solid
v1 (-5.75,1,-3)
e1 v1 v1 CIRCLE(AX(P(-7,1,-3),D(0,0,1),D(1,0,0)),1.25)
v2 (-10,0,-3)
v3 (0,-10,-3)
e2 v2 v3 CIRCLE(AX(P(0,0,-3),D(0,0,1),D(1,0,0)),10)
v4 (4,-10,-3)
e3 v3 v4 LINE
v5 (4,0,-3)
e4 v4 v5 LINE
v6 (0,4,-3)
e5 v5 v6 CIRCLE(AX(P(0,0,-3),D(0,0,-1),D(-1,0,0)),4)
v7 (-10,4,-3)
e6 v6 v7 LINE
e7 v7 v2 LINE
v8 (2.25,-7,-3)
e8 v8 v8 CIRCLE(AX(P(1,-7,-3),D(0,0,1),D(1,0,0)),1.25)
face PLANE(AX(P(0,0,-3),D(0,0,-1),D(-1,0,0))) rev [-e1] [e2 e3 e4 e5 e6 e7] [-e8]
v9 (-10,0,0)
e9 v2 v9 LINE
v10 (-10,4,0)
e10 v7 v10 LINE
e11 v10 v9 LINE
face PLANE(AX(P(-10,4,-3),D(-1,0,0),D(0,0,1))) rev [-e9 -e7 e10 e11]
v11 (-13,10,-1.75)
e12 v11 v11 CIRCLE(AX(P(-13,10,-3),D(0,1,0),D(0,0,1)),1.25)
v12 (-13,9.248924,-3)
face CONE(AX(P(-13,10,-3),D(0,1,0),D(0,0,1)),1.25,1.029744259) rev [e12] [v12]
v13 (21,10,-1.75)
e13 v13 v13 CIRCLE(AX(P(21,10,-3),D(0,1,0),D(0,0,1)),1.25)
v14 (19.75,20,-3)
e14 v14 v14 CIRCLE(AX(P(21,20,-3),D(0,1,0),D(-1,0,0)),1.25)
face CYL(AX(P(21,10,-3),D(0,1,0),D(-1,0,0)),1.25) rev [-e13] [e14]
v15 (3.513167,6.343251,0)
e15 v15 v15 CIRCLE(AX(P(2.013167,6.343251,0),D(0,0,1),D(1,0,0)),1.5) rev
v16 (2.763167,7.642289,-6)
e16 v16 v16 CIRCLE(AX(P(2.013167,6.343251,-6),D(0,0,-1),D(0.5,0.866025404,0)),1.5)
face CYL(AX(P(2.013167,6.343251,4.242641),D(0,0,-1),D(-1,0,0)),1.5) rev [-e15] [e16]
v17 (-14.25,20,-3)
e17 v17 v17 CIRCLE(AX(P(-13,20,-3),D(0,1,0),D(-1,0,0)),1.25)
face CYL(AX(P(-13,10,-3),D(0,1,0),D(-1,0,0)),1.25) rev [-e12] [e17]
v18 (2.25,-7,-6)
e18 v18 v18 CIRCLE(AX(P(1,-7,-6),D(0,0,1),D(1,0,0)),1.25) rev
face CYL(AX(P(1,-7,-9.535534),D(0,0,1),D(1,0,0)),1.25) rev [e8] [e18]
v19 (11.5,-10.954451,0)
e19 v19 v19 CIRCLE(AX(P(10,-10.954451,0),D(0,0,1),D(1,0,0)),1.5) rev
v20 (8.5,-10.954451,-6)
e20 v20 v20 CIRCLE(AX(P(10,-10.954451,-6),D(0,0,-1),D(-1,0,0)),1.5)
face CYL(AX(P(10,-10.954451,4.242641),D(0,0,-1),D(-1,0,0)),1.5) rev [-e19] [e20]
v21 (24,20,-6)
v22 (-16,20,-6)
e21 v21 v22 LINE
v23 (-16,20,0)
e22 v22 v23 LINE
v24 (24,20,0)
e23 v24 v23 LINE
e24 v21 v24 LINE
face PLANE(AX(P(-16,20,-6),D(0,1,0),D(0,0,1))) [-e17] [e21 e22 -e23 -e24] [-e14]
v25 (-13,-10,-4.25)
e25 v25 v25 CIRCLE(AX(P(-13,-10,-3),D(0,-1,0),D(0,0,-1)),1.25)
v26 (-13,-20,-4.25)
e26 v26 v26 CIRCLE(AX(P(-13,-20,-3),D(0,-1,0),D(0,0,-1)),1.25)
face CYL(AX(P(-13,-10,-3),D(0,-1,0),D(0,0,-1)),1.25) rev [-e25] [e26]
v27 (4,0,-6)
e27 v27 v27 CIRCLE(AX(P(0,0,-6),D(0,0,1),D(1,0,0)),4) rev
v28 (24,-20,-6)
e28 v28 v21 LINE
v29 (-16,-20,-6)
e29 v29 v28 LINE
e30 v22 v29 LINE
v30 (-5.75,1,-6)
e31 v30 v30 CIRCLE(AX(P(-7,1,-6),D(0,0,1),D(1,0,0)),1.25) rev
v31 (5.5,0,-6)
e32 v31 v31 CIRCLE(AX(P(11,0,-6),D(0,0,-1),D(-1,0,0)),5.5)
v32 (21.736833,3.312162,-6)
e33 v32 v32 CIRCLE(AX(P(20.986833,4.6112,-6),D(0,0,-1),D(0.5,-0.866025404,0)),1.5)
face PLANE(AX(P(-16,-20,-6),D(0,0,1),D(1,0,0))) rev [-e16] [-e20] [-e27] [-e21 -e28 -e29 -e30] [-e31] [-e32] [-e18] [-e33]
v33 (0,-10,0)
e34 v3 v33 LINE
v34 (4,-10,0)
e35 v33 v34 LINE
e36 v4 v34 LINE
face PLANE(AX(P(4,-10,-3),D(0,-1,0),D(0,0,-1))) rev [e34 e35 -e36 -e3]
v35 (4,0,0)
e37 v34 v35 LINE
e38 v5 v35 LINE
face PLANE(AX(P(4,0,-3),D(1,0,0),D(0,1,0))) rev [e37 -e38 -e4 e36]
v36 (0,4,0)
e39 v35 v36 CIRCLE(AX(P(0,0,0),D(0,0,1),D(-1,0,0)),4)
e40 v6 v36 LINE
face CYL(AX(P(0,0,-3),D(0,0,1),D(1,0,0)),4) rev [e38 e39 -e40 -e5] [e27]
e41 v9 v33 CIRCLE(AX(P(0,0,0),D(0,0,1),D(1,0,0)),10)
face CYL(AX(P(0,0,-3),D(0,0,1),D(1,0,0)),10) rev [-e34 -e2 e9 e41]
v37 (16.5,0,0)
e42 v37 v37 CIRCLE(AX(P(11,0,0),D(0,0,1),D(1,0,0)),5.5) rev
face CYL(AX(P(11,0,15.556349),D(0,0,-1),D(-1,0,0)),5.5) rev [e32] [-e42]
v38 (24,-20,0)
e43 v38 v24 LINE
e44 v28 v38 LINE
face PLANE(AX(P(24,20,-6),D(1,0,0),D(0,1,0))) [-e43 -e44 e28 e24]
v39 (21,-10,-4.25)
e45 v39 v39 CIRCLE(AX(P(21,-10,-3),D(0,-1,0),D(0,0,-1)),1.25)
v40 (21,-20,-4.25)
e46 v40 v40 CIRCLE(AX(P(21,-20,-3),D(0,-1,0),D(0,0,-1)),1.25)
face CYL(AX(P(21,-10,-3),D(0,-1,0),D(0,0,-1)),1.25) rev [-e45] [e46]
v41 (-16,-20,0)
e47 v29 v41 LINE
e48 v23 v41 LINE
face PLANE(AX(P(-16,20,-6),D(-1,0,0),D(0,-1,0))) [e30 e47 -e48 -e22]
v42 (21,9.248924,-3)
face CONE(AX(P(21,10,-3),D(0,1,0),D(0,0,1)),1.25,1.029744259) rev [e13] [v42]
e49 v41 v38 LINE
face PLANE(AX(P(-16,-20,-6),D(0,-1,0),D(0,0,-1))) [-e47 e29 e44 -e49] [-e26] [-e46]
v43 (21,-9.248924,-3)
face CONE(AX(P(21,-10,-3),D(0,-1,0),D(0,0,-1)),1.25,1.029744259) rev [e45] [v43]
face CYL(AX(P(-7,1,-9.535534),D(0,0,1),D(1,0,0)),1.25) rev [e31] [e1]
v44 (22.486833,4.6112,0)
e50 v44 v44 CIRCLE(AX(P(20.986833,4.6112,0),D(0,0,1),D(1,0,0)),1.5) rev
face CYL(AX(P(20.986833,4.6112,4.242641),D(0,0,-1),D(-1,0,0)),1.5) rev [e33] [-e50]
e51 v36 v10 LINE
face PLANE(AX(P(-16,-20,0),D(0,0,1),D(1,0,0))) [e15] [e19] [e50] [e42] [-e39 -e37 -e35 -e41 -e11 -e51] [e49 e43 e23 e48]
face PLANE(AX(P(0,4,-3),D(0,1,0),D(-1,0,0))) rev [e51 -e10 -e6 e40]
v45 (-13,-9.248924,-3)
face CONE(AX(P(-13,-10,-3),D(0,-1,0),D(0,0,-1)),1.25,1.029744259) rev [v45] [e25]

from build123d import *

# Parameters (mm, degrees)
SKETCH1_W          = 40
SKETCH1_H          = 40
EXTRUDE1_DEPTH     = 6
SKETCH8_R          = 5.5
CUT_EXTRUDE6_DEPTH = 6
SKETCH5_R          = 1.5
CUT_EXTRUDE4_DEPTH = 6
CIRPATTERN1_COUNT  = 3
EXTRUDE15_DEPTH    = 3
SKETCH35_R         = 1.25
EXTRUDE17_DEPTH    = 3
SKETCH34_R         = 4
EXTRUDE16_DEPTH    = 3
SKETCH27_R         = 1.25
EXTRUDE6_DEPTH     = 10
EXTRUDE18_START    = -10
SKETCH36_R         = 1.25
EXTRUDE18_DEPTH    = 10


# Read off the part's stored shape, not the designer's step: M3 Tapped Hole1
with BuildPart() as part:
    # Sketch1 → Extrude1 (new body)
    with BuildSketch(Plane.XY):
        with Locations((4, 0)):
            Rectangle(SKETCH1_W, SKETCH1_H)
    extrude(amount=-EXTRUDE1_DEPTH)

    # Sketch8 → Cut-Extrude6 (cut)
    with BuildSketch(Plane(origin=(0, 0, -6), x_dir=(-1, 0, 0), z_dir=(0, 0, -1))):
        with Locations((-11, 0)):
            Circle(SKETCH8_R)
    extrude(amount=-CUT_EXTRUDE6_DEPTH, mode=Mode.SUBTRACT)

    # Sketch5 → Cut-Extrude4 (cut)
    with BuildSketch(Plane(origin=(0, 0, -6), x_dir=(-1, 0, 0), z_dir=(0, 0, -1))):
        with Locations((-10, -10.95445115)):
            Circle(SKETCH5_R)
    cut_extrude4 = extrude(amount=-CUT_EXTRUDE4_DEPTH, mode=Mode.SUBTRACT)

    # CirPattern1: Cut-Extrude4 ×3 about axis
    cirpattern1_axis = Axis((11, 0, 0), (0, 0, 1))
    for i in range(1, CIRPATTERN1_COUNT):
        add(cut_extrude4.rotate(cirpattern1_axis, i * 360 / CIRPATTERN1_COUNT), mode=Mode.SUBTRACT)

    # Sketch29 → Extrude15 (cut)
    with BuildSketch(Plane.XY):
        with BuildLine():
            Line((4, 0), (4, -10))
            Line((4, -10), (0, -10))
            ThreePointArc((0, -10), (-7.071067812, -7.071067812), (-10, 0))
            Line((-10, 0), (-10, 4))
            Line((-10, 4), (0, 4))
            ThreePointArc((0, 4), (2.828427125, 2.828427125), (4, 0))
        make_face()
    extrude(amount=-EXTRUDE15_DEPTH, mode=Mode.SUBTRACT)

    # Sketch35 → Extrude17 (cut)
    with BuildSketch(Plane.XY.offset(-3)):
        with Locations((1, -7)):
            Circle(SKETCH35_R)
        with Locations((-7, 1)):
            Circle(SKETCH35_R)
    extrude(amount=-EXTRUDE17_DEPTH, mode=Mode.SUBTRACT)

    # Sketch34 → Extrude16 (cut)
    with BuildSketch(Plane.XY.offset(-3)):
        Circle(SKETCH34_R)
    extrude(amount=-EXTRUDE16_DEPTH, mode=Mode.SUBTRACT)

    # Sketch27 → Extrude6 (cut)
    with BuildSketch(Plane(origin=(0, 20, 0), x_dir=(1, 0, 0), z_dir=(0, 1, 0))):
        with Locations(Location((-13, 3, 0), (0, 0, 180))):
            Circle(SKETCH27_R)
        with Locations(Location((21, 3, 0), (0, 0, 180))):
            Circle(SKETCH27_R)
    extrude(amount=-EXTRUDE6_DEPTH, mode=Mode.SUBTRACT)

    # Sketch36 → Extrude18 (cut)
    with BuildSketch(Plane.XZ.offset(20).offset(EXTRUDE18_START)):
        with Locations(Location((-13, -3, 0), (0, 0, 180))):
            Circle(SKETCH36_R)
        with Locations(Location((21, -3, 0), (0, 0, 180))):
            Circle(SKETCH36_R)
    extrude(amount=EXTRUDE18_DEPTH, mode=Mode.SUBTRACT)

    # M3 Tapped Hole1 outline → M3 Tapped Hole1 (revolve, cut)
    with BuildSketch(Plane(origin=(21, 0, -3), x_dir=(1, 0, 0), z_dir=(0, 0, 1))):
        Polygon((1.25, -10), (0, -9.248924226), (0, -10), align=None)
        Polygon((0, 10), (0, 9.248924226), (1.25, 10), align=None)
    revolve(axis=Axis((21, 0, -3), (0, 1, 0)), mode=Mode.SUBTRACT)

    # M3 Tapped Hole1 2 outline → M3 Tapped Hole1 2 (revolve, cut)
    with BuildSketch(Plane(origin=(-13, 0, -3), x_dir=(1, 0, 0), z_dir=(0, 0, 1))):
        Polygon((1.25, -10), (0, -9.248924226), (0, -10), align=None)
        Polygon((0, 10), (0, 9.248924226), (1.25, 10), align=None)
    revolve(axis=Axis((-13, 0, -3), (0, 1, 0)), mode=Mode.SUBTRACT)


solid = part.part
